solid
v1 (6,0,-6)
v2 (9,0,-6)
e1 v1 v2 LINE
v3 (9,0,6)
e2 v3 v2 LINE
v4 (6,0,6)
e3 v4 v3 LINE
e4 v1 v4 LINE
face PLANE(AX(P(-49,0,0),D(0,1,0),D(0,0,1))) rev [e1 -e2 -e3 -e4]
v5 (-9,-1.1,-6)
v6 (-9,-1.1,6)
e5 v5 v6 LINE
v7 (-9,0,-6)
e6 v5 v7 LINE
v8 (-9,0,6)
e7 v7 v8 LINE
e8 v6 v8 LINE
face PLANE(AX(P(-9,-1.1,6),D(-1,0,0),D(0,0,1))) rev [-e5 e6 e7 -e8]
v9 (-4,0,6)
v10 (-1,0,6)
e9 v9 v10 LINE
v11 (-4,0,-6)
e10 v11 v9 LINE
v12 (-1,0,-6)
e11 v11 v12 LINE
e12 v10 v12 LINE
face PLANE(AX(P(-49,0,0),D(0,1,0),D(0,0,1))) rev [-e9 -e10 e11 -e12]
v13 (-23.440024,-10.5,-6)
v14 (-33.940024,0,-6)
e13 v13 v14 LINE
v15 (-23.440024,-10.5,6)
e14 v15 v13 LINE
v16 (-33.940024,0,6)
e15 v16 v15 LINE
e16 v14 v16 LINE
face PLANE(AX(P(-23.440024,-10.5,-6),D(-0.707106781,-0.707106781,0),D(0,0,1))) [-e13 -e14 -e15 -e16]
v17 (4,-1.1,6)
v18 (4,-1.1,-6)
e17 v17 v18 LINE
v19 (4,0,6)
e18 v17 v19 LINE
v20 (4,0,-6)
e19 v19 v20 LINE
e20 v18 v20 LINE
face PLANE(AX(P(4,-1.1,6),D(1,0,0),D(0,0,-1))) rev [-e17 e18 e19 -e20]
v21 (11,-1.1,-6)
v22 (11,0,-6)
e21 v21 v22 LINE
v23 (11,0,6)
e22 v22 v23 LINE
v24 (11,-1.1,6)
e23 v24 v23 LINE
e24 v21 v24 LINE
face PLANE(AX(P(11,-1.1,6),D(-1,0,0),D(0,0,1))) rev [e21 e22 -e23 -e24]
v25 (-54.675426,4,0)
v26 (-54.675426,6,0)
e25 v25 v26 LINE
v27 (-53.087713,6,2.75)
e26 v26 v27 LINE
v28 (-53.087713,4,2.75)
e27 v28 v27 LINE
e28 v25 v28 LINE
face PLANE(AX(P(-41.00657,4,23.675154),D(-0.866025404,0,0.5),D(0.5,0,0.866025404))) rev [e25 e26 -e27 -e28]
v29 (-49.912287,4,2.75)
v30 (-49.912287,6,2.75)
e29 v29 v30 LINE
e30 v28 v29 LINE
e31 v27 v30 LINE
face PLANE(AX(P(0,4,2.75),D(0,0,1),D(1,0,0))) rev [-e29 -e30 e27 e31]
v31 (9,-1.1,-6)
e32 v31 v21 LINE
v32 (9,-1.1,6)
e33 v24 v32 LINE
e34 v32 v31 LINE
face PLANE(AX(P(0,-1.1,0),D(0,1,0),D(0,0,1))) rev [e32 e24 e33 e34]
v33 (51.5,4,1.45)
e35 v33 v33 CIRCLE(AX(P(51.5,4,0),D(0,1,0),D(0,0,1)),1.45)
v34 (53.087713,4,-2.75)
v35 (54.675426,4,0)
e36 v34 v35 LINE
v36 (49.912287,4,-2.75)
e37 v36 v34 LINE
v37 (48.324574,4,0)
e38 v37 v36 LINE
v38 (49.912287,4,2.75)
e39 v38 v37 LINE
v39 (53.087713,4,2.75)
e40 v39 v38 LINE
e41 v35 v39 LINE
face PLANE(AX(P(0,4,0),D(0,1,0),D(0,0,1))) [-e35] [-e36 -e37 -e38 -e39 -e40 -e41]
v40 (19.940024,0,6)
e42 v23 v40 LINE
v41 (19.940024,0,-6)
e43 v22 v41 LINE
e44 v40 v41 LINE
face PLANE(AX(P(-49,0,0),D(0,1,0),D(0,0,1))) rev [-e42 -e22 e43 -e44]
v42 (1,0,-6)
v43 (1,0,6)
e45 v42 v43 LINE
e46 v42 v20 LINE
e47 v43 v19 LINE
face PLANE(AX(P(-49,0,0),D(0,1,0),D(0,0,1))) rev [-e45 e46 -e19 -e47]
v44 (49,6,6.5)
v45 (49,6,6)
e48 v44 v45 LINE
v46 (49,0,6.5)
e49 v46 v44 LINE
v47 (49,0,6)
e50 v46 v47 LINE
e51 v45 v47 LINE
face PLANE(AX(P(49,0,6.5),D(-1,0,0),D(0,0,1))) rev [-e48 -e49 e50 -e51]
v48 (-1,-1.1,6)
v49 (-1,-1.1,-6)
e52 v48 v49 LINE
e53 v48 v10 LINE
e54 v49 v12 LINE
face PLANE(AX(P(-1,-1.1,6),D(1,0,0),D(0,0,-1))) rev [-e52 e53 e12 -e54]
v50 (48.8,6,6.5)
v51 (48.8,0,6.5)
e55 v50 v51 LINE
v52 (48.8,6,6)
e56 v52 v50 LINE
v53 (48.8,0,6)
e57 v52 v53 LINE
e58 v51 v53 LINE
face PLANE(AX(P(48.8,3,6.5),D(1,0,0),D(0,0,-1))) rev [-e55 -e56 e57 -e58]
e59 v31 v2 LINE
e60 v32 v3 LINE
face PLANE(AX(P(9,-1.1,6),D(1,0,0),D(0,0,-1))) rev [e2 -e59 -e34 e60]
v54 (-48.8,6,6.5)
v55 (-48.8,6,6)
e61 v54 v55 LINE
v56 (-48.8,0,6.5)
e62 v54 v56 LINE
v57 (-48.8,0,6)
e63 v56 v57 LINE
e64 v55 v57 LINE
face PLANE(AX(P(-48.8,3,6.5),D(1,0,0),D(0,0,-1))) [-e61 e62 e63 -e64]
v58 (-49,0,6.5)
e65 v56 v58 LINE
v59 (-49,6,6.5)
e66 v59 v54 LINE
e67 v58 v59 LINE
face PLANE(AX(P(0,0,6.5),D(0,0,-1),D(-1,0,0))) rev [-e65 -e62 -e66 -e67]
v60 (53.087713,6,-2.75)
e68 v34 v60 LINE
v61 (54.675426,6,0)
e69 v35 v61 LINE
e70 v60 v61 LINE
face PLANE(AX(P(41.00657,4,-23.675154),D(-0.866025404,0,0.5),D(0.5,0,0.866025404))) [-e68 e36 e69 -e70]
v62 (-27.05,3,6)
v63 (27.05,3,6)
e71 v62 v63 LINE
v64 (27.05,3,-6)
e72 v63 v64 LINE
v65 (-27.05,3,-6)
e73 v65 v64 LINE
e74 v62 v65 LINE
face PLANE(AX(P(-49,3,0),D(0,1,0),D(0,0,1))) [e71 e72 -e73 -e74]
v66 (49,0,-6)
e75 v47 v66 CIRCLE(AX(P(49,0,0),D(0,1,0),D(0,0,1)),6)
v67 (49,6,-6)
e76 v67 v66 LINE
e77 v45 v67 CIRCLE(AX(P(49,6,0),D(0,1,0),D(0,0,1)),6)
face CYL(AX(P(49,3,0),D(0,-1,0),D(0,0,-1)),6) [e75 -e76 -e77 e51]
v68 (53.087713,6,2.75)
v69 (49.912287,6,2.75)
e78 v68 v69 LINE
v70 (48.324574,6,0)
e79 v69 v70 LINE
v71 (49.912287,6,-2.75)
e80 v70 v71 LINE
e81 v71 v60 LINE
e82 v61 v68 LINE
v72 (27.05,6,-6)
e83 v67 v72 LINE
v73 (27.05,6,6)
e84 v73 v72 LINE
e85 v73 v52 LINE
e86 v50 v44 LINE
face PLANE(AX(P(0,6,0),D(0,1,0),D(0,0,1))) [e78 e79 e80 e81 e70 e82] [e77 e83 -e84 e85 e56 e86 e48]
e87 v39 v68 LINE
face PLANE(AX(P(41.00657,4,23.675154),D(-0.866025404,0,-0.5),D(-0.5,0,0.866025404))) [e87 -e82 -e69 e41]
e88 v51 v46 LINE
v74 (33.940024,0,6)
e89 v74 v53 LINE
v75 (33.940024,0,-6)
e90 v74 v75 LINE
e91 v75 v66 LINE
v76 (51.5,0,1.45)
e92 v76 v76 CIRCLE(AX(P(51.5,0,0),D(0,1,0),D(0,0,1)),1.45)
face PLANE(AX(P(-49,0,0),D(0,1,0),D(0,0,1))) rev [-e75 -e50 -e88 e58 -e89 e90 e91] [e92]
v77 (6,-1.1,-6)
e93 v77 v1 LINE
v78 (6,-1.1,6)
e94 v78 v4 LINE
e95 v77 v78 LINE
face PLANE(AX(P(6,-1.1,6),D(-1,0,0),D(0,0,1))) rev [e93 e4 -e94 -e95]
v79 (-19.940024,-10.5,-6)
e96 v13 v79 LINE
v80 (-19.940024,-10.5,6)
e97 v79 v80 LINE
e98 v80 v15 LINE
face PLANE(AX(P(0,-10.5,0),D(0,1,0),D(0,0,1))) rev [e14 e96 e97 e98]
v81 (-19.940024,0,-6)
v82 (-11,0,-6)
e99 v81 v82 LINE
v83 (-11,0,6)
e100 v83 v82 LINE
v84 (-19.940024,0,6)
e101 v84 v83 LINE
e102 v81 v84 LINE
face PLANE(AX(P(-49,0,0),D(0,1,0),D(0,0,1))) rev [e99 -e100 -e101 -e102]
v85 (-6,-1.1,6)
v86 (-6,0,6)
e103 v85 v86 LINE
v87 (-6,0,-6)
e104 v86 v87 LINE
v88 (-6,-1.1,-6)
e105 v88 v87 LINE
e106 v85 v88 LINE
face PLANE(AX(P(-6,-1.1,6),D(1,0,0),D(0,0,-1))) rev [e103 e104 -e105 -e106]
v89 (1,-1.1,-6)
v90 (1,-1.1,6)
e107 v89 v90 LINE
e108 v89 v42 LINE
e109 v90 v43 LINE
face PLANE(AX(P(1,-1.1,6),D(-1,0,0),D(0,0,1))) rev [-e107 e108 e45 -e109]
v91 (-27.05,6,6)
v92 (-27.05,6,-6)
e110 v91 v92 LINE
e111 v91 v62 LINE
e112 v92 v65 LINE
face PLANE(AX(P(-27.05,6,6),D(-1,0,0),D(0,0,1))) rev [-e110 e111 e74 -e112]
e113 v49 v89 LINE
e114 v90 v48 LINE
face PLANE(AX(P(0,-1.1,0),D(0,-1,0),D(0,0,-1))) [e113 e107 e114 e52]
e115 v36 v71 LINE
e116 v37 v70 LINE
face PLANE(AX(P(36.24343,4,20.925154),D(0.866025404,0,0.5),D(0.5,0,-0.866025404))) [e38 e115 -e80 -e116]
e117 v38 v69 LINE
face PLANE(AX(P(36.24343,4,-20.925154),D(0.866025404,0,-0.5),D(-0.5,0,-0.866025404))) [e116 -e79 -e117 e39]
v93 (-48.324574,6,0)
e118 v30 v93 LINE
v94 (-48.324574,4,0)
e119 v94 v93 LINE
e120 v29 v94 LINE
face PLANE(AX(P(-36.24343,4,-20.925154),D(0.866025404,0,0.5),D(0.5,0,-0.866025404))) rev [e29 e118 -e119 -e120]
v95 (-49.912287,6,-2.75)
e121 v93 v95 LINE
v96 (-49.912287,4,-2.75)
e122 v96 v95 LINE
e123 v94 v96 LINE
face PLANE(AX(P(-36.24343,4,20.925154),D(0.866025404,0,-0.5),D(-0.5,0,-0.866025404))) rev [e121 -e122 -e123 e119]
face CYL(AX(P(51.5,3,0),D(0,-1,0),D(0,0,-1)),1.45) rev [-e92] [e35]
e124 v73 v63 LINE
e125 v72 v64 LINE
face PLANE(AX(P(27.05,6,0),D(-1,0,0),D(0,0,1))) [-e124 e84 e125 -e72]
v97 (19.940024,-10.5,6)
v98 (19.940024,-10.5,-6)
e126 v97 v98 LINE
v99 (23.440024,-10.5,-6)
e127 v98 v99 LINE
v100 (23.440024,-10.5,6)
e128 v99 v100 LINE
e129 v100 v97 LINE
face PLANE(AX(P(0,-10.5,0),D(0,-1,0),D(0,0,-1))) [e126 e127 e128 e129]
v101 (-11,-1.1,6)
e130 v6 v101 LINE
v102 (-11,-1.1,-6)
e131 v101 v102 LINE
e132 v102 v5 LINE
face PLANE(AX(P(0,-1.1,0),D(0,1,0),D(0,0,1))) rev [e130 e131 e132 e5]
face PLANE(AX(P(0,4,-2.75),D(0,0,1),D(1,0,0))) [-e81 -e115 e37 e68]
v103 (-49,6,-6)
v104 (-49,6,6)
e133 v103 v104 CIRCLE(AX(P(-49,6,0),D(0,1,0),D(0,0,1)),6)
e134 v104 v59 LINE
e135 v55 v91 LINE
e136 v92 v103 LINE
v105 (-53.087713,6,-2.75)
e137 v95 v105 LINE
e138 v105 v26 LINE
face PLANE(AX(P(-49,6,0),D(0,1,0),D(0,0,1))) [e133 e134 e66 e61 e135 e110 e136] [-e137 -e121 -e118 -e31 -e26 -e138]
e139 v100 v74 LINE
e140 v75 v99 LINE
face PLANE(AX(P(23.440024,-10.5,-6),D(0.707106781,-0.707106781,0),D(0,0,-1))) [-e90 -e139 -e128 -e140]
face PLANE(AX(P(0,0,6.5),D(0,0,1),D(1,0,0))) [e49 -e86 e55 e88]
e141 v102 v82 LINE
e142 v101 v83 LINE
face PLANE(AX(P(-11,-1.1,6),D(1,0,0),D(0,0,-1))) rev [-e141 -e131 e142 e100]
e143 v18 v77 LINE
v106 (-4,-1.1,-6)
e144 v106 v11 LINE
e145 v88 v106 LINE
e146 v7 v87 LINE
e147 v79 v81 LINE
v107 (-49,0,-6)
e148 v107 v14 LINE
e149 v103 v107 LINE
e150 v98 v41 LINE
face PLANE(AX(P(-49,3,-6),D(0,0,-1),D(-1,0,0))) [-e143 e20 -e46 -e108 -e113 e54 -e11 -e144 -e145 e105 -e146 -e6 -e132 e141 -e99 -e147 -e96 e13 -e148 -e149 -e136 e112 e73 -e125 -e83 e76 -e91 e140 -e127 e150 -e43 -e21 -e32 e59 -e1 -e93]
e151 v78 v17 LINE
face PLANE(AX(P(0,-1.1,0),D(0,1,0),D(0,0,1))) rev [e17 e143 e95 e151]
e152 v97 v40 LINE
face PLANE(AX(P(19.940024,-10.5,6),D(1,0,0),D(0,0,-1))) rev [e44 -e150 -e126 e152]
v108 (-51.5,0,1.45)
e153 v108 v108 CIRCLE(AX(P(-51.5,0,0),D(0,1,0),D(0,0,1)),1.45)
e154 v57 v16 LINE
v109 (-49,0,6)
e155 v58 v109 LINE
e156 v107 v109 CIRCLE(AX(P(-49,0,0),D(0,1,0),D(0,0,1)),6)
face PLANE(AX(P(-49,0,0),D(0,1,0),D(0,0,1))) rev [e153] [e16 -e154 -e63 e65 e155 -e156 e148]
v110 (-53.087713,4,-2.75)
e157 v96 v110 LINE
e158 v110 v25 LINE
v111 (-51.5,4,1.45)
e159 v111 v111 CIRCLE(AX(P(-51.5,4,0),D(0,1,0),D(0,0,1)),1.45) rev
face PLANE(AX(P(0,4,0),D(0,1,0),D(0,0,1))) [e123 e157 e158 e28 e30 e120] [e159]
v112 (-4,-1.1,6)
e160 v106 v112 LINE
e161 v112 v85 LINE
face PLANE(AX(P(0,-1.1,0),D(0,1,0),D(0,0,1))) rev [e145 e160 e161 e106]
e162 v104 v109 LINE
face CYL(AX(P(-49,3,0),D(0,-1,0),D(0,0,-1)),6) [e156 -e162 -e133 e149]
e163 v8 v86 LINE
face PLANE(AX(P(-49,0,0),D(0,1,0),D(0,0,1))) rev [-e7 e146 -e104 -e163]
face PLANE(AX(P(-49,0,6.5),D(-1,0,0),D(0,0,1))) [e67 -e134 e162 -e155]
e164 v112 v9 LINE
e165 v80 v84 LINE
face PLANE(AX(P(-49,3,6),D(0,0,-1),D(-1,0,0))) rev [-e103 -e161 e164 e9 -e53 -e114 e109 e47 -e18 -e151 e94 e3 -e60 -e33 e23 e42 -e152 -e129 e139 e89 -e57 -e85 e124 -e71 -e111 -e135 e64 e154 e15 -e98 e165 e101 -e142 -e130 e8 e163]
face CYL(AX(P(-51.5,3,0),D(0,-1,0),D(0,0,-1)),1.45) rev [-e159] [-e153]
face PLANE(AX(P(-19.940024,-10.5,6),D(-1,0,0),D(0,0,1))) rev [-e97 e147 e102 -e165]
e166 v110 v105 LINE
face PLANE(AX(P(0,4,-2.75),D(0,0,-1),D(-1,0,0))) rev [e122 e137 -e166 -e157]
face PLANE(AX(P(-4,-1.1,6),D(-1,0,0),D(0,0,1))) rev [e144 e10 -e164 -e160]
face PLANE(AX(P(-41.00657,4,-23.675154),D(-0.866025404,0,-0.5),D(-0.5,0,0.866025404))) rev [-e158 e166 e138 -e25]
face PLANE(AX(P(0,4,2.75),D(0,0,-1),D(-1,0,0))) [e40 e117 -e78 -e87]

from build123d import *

# Parameters (mm, degrees)
SKETCH1_R                 = 1.45
BOSS_EXTRUDE1_DEPTH       = 3
SKETCH4_W                 = 3.5
SKETCH4_H                 = 12
BOSS_EXTRUDE3_DEPTH       = 10.5
SKETCH5_W                 = 2
SKETCH5_H                 = 12
BOSS_EXTRUDE4_DEPTH       = 1.1
SKETCH6_W                 = 0.2
SKETCH6_H                 = 3
BOSS_EXTRUDE5_DEPTH       = 0.5
CHAMFER1_SIZE             = 10.5
F_3_0MM_DOWEL_HOLE1_D     = 2.9
F_3_0MM_DOWEL_HOLE1_DEPTH = 13.5
SKETCH10_R                = 1.45
BOSS_EXTRUDE6_DEPTH       = 3
CUT_EXTRUDE1_START        = -2
SKETCH11_R                = 1.45
CUT_EXTRUDE1_DEPTH        = 2


with BuildPart() as part:
    # Sketch1 → Boss-Extrude1 (new body)
    with BuildSketch(Plane(origin=(0, 0, 0), x_dir=(1, 0, 0), z_dir=(0, 1, 0))):
        with BuildLine():
            Line((-49, 6), (49, 6))
            ThreePointArc((49, 6), (55, 0), (49, -6))
            Line((49, -6), (-49, -6))
            ThreePointArc((-49, -6), (-55, 0), (-49, 6))
        make_face()
        with Locations(Location((-51.5, 0, 0), (0, 0, 270))):
            Circle(SKETCH1_R, mode=Mode.SUBTRACT)
        with Locations(Location((51.5, 0, 0), (0, 0, 270))):
            Circle(SKETCH1_R, mode=Mode.SUBTRACT)
    extrude(amount=BOSS_EXTRUDE1_DEPTH)

    # Sketch4 → Boss-Extrude3 (add)
    with BuildSketch(Plane.XZ):
        with Locations((-21.690023983, 0)):
            Rectangle(SKETCH4_W, SKETCH4_H)
        with Locations((21.690023983, 0)):
            Rectangle(SKETCH4_W, SKETCH4_H)
    extrude(amount=BOSS_EXTRUDE3_DEPTH)

    # Sketch5 → Boss-Extrude4 (add)
    with BuildSketch(Plane.XZ):
        with Locations((5, 0)):
            Rectangle(SKETCH5_W, SKETCH5_H)
        Rectangle(SKETCH5_W, SKETCH5_H)
        with Locations((10, 0)):
            Rectangle(SKETCH5_W, SKETCH5_H)
        with Locations((-5, 0)):
            Rectangle(SKETCH5_W, SKETCH5_H)
        with Locations((-10, 0)):
            Rectangle(SKETCH5_W, SKETCH5_H)
    extrude(amount=BOSS_EXTRUDE4_DEPTH)

    # Sketch6 → Boss-Extrude5 (add)
    with BuildSketch(Plane.XY.offset(6)):
        with Locations((48.9, 1.5)):
            Rectangle(SKETCH6_W, SKETCH6_H)
        with Locations((-48.9, 1.5)):
            Rectangle(SKETCH6_W, SKETCH6_H)
    extrude(amount=BOSS_EXTRUDE5_DEPTH)

    # Chamfer1
    chamfer1_edges = [part.edges().sort_by_distance(p)[0] for p in [
        (23.440023983, 0, 0),
        (-23.440023983, 0, 0),
    ]]
    chamfer(chamfer1_edges, length=CHAMFER1_SIZE - 0.0001)  # a hair under: the kernel refuses the full size

    # Ø3.0mm Dowel Hole1
    with Locations(Plane(origin=(0, 3, 0), x_dir=(1, 0, 0), z_dir=(0, 1, 0))):
        with Locations((-51.5, 0), (51.5, 0)):
            Hole(F_3_0MM_DOWEL_HOLE1_D / 2, depth=F_3_0MM_DOWEL_HOLE1_DEPTH)

    # Sketch10 → Boss-Extrude6 (add)
    # profile 1 of 2: a face of its own
    with BuildSketch(Plane(origin=(0, 3, 0), x_dir=(1, 0, 0), z_dir=(0, 1, 0))):
        with BuildLine():
            Line((-48.8, -6), (-27.05, -6))
            Line((-27.05, -6), (-27.05, 6))
            Line((-27.05, 6), (-49, 6))
            ThreePointArc((-49, 6), (-55, 0), (-49, -6))
            Line((-49, -6), (-49, -6.5))
            Line((-49, -6.5), (-48.8, -6.5))
            Line((-48.8, -6.5), (-48.8, -6))
        make_face()
        with Locations(Location((-51.5, 0, 0), (0, 0, 270.000000001))):
            Circle(SKETCH10_R, mode=Mode.SUBTRACT)
    # profile 2 of 2: a face of its own
    with BuildSketch(Plane(origin=(0, 3, 0), x_dir=(1, 0, 0), z_dir=(0, 1, 0))):
        with BuildLine():
            Line((27.05, 6), (27.05, -6))
            Line((27.05, -6), (48.8, -6))
            Line((48.8, -6), (48.8, -6.5))
            Line((48.8, -6.5), (49, -6.5))
            Line((49, -6.5), (49, -6))
            ThreePointArc((49, -6), (55, 0), (49, 6))
            Line((49, 6), (27.05, 6))
        make_face()
        with Locations(Location((51.5, 0, 0), (0, 0, 270))):
            Circle(SKETCH10_R, mode=Mode.SUBTRACT)
    extrude(amount=BOSS_EXTRUDE6_DEPTH)

    # Sketch11 → Cut-Extrude1 (cut)
    # profile 1 of 2: a face of its own
    with BuildSketch(Plane(origin=(0, 6, 0), x_dir=(1, 0, 0), z_dir=(0, 1, 0)).offset(CUT_EXTRUDE1_START)):
        Polygon((53.08771324, 2.75), (54.675426481, 0), (53.08771324, -2.75), (49.91228676, -2.75), (48.324573519, 0), (49.91228676, 2.75), align=None)
    # profile 2 of 2: a face of its own
    with BuildSketch(Plane(origin=(0, 6, 0), x_dir=(1, 0, 0), z_dir=(0, 1, 0)).offset(CUT_EXTRUDE1_START)):
        Polygon((-48.324573519, 0), (-49.91228676, 2.75), (-53.08771324, 2.75), (-54.675426481, 0), (-53.08771324, -2.75), (-49.91228676, -2.75), align=None)
        with Locations(Location((-51.5, 0, 0), (0, 0, 270.000000001))):
            Circle(SKETCH11_R, mode=Mode.SUBTRACT)
    extrude(amount=CUT_EXTRUDE1_DEPTH, mode=Mode.SUBTRACT)


solid = part.part
